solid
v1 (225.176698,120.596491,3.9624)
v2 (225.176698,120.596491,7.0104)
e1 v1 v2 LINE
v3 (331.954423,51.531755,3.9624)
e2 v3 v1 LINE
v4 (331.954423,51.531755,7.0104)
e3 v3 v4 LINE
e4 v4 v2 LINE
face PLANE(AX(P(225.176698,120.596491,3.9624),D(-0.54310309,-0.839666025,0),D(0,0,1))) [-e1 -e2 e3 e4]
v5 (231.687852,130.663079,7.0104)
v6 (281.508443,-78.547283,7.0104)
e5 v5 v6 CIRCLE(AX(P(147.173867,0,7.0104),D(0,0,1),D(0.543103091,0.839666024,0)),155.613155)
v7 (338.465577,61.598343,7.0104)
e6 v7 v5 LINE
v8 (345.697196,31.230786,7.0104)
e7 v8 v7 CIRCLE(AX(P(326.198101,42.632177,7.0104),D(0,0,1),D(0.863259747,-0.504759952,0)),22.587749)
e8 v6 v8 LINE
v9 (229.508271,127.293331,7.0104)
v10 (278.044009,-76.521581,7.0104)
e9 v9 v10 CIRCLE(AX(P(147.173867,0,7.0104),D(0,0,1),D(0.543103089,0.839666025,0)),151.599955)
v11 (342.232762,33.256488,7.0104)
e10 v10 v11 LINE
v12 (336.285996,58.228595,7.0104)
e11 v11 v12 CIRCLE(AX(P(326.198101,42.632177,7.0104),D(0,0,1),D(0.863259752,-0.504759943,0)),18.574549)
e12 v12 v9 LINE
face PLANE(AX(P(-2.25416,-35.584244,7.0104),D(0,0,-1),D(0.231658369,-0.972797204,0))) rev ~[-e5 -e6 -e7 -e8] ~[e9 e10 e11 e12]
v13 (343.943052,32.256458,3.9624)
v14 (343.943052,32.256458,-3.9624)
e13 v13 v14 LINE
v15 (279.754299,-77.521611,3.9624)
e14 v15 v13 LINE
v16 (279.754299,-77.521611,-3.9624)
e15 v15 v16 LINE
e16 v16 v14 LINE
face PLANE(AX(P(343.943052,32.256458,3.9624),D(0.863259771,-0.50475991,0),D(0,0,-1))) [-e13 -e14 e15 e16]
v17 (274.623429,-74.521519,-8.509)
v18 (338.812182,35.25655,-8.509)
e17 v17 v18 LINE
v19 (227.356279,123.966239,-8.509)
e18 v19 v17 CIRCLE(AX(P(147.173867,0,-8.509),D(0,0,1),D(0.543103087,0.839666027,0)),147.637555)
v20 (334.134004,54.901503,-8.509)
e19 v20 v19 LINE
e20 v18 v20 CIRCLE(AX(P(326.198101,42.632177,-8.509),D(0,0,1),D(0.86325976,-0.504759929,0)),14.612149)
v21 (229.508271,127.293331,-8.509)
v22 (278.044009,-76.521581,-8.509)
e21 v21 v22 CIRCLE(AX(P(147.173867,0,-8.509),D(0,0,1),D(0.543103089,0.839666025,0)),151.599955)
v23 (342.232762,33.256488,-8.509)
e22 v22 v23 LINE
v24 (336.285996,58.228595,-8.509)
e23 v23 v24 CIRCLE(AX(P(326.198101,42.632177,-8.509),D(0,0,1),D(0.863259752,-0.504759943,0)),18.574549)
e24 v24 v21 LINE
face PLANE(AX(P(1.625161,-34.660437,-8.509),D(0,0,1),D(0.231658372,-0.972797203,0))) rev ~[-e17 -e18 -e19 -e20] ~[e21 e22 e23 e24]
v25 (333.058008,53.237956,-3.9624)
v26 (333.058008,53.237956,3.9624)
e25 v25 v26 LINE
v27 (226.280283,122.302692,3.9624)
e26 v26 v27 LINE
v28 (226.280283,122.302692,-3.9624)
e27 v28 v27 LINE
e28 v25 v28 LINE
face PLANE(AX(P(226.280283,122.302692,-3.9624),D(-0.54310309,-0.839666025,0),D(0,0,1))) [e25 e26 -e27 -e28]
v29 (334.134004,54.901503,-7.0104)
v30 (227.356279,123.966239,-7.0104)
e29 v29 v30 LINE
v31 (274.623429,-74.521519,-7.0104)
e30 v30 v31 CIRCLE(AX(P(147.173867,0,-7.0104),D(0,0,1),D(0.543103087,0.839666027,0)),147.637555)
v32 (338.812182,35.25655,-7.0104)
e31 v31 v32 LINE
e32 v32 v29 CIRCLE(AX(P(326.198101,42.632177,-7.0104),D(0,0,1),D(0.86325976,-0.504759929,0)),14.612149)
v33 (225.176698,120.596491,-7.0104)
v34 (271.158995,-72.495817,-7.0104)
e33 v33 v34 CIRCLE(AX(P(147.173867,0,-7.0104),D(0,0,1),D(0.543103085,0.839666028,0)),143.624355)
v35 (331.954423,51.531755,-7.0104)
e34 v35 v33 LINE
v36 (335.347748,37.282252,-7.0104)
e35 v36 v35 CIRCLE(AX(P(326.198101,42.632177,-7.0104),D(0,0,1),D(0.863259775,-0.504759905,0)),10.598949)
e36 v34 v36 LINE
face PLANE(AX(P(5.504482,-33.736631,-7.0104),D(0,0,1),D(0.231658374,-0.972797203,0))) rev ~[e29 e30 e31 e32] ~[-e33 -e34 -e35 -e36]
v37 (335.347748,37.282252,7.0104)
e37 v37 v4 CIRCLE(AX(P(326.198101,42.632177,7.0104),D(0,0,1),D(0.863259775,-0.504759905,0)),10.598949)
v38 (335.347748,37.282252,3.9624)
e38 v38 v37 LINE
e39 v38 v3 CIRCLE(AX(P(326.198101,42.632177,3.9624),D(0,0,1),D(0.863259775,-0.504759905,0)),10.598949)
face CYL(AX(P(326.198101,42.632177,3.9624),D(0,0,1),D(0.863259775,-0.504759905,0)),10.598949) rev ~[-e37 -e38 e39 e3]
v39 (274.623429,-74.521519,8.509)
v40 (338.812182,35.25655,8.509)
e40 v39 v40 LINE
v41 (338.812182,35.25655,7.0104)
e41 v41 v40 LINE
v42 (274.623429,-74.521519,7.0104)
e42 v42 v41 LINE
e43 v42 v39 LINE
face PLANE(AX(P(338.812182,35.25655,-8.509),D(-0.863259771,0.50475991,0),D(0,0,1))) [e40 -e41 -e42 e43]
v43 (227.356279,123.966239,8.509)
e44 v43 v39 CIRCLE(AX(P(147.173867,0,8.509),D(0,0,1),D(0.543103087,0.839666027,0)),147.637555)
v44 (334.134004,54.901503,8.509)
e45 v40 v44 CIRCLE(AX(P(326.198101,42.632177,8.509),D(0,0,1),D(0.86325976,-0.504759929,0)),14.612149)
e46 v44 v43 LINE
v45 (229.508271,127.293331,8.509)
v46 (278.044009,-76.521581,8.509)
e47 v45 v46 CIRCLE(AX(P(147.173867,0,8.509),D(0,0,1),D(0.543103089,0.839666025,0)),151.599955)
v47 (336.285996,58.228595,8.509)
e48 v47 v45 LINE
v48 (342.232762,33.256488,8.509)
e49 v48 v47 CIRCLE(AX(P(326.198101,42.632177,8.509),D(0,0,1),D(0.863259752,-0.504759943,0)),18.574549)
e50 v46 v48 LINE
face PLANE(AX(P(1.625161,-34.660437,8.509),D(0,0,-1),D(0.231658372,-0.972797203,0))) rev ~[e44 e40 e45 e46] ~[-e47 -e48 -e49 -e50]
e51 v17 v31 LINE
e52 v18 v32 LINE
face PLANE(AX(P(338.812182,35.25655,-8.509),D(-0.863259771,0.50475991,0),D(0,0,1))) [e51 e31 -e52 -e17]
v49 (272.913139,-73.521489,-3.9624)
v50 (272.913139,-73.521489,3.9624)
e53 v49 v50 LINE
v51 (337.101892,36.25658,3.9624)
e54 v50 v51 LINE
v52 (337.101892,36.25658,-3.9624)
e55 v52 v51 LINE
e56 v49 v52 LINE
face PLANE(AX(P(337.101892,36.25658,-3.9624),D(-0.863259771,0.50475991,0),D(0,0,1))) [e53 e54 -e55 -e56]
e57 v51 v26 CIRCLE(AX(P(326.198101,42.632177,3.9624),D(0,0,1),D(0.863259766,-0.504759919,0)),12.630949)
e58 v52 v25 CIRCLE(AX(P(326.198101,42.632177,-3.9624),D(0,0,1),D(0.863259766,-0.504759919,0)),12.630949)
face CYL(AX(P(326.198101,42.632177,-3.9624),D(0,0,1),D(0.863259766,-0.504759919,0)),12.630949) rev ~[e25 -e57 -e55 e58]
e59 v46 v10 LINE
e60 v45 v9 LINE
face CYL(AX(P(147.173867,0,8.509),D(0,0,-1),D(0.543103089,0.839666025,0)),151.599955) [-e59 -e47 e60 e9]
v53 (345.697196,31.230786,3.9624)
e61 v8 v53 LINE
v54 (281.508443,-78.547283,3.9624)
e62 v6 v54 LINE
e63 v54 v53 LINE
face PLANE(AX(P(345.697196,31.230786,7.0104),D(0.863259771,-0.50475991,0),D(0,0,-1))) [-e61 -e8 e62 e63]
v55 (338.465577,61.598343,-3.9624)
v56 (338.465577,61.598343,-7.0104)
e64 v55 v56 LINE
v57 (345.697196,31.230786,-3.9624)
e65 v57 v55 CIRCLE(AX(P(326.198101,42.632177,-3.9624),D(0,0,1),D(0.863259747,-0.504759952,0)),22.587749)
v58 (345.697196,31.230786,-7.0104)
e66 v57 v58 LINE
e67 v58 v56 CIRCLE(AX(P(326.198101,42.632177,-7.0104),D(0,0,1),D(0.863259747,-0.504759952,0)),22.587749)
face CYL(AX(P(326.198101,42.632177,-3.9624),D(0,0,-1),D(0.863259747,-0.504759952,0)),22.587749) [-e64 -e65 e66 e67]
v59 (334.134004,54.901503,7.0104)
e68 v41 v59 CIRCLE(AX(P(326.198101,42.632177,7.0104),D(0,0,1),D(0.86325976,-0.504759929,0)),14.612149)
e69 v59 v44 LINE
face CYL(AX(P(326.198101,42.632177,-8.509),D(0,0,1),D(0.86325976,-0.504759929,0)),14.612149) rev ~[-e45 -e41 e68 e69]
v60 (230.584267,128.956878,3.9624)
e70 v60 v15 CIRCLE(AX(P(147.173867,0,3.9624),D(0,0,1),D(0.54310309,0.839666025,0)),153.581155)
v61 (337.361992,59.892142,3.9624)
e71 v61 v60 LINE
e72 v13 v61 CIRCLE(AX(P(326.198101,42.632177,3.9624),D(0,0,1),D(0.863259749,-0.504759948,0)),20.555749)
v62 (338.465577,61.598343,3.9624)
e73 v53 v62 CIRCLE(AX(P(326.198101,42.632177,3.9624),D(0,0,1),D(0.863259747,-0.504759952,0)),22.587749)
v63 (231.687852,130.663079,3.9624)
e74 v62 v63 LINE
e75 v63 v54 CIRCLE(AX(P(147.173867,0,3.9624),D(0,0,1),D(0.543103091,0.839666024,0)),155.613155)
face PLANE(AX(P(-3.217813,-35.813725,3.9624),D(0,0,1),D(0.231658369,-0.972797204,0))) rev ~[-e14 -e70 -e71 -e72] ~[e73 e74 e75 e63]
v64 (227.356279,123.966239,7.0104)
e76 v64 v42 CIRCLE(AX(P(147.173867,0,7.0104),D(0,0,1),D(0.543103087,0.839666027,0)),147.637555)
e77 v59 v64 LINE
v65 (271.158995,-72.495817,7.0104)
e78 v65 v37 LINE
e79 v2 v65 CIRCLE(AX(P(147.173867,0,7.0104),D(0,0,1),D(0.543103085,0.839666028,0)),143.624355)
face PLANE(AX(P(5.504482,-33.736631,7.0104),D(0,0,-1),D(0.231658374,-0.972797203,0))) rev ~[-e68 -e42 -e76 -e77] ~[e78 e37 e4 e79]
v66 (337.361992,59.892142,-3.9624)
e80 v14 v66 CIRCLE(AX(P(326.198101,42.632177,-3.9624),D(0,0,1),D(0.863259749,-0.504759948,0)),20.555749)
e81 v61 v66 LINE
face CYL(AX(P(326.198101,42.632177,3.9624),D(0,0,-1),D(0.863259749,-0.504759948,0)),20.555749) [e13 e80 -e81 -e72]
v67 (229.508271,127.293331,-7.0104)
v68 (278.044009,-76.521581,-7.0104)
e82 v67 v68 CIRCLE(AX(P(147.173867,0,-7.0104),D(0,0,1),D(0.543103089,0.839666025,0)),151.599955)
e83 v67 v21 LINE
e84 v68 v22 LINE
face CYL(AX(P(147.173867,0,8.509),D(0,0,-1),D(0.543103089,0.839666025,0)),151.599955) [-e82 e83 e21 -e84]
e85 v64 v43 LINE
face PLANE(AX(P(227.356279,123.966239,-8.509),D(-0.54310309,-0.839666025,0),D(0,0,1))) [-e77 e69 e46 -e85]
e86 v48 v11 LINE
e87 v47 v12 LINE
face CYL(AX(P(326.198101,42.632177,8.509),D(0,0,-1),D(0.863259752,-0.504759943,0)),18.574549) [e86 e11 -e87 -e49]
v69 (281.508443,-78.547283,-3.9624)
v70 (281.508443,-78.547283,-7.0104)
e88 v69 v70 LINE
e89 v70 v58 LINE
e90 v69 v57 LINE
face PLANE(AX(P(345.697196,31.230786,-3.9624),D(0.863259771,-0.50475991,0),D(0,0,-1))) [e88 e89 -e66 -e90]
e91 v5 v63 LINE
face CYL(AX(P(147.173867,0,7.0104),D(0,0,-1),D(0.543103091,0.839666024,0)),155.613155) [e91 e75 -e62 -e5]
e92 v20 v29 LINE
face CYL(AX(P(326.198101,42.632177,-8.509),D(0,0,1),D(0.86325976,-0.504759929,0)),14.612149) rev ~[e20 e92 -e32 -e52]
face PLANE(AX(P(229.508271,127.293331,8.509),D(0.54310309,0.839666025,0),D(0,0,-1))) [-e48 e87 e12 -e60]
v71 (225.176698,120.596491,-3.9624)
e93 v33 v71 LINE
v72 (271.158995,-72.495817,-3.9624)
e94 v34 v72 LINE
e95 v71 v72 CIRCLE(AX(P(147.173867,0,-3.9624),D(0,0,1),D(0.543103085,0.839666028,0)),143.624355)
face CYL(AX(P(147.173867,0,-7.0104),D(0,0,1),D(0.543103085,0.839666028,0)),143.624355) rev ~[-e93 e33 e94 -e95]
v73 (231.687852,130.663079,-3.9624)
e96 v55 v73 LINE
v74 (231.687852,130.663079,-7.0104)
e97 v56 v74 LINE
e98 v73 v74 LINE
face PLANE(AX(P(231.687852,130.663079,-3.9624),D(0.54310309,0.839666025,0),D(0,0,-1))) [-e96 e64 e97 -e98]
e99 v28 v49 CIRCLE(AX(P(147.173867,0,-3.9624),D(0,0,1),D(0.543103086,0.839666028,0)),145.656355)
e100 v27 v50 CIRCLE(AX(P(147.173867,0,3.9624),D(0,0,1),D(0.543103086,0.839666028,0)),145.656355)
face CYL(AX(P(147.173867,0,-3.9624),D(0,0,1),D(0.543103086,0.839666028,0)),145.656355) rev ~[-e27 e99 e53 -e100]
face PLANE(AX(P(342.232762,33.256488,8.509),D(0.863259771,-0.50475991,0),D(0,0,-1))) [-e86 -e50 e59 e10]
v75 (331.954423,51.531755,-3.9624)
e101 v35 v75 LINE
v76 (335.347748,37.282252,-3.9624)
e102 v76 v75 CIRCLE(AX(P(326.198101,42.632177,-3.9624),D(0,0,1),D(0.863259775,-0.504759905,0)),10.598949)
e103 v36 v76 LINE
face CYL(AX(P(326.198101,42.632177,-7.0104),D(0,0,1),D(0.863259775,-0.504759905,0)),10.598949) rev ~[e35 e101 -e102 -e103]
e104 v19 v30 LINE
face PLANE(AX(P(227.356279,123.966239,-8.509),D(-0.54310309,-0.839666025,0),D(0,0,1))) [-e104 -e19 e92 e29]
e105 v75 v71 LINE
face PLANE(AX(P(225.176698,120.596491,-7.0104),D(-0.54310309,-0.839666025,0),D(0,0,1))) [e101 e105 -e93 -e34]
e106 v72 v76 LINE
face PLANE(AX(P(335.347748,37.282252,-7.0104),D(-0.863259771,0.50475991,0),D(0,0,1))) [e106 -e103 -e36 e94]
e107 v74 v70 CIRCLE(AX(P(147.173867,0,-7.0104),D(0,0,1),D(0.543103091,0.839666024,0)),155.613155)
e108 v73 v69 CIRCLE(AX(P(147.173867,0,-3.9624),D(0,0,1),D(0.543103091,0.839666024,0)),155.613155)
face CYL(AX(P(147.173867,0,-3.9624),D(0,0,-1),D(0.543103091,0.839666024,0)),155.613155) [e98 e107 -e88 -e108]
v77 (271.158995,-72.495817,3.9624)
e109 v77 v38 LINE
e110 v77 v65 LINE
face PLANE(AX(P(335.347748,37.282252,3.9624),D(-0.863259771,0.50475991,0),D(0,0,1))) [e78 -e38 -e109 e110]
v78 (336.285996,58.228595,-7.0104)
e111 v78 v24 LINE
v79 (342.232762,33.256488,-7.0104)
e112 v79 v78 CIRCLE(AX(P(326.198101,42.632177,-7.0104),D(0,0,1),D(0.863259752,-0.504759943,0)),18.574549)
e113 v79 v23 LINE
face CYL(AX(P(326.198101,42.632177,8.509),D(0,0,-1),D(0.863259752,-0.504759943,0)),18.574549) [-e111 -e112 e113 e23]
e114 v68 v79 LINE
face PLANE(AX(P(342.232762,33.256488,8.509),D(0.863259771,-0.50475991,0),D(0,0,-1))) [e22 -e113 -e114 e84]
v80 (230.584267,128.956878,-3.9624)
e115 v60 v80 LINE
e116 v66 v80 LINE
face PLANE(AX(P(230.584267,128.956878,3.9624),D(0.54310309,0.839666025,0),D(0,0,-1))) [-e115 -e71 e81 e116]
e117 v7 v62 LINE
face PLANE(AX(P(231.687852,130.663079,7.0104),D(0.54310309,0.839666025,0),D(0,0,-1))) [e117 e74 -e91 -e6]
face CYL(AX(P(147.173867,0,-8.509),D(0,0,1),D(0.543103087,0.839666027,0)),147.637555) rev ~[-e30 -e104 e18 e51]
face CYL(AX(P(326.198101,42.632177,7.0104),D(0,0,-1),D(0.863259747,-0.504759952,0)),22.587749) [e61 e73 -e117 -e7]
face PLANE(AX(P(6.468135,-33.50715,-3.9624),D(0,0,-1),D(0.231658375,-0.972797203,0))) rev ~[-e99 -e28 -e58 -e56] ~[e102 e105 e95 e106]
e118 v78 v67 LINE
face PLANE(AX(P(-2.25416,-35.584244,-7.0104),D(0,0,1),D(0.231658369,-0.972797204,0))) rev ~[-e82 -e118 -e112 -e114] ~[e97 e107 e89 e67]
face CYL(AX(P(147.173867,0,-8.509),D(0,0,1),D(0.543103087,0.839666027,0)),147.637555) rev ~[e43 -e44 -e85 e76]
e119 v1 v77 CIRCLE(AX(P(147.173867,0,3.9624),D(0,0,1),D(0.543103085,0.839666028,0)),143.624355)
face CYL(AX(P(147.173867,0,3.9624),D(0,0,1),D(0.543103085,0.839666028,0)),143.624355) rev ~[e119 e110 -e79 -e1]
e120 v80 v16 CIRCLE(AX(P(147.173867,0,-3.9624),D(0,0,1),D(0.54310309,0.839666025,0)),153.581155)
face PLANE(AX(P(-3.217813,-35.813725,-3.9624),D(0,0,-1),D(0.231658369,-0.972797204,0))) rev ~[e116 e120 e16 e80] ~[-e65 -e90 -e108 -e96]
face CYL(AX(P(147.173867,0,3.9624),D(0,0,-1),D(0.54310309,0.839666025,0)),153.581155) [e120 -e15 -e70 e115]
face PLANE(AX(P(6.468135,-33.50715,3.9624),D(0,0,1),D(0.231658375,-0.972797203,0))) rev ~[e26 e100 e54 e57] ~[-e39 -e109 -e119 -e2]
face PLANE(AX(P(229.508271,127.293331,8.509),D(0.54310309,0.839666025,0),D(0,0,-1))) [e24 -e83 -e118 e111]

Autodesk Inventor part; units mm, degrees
ref_plane "Work Plane2" through (326.198101, 42.632177, 0) normal (-1, 0, 0) x (0, 0, 1)
ref_plane "Work Plane3" through (147.173867, 0, 0) normal (0.5273915, 0.8496224, 0) x (0, 0, 1)
sketch "Path" plane through (0, 0, 0) normal (0, 0, 1) x (1, 0, 0)
  arc A0 (340.522472, 34.256519) -> (335.21, 56.565049) centre (326.198101, 42.632177) ccw
  arc A1 (228.432275, 125.629785) -> (276.333719, -75.52155) centre (147.173867, 0) ccw
  line L0 (228.432275, 125.629785) -> (335.21, 56.565049)
  line L1 (340.522472, 34.256519) -> (276.333719, -75.52155)
  dimension "d31" = 11.9888
ref_plane "Section Plane" through (335.21, 56.565049, 0) normal (-0.839666, 0.5431031, 0) x (0, 0, 1)
sketch "Section Sketch" plane through (335.21, 56.565049, 0) normal (-0.839666, 0.5431031, 0) x (0, 0, 1)
  line L0 (-8.509, -1.9812) -> (8.509, -1.9812)
  line L1 (8.509, -1.9812) -> (8.509, 1.9812)
  line L2 (8.509, 1.9812) -> (-8.509, 1.9812)
  line L3 (-8.509, 1.9812) -> (-8.509, -1.9812)
  line L4 (-3.9624, -3.9624) -> (3.9624, -3.9624)
  line L5 (3.9624, -3.9624) -> (3.9624, 3.9624)
  line L6 (3.9624, 3.9624) -> (-3.9624, 3.9624)
  line L7 (-3.9624, 3.9624) -> (-3.9624, -3.9624)
  line L8 (-3.9624, 0) -> (3.9624, 0) construction
  line L9 (-7.0104, -5.9944) -> (-3.9624, -5.9944)
  line L10 (-3.9624, -5.9944) -> (-3.9624, 5.9944)
  line L11 (-3.9624, 5.9944) -> (-7.0104, 5.9944)
  line L12 (-7.0104, 5.9944) -> (-7.0104, -5.9944)
  line L13 (3.9624, -5.9944) -> (7.0104, -5.9944)
  line L14 (7.0104, -5.9944) -> (7.0104, 5.9944)
  line L15 (7.0104, 5.9944) -> (3.9624, 5.9944)
  line L16 (3.9624, 5.9944) -> (3.9624, -5.9944)
  line L17 (-8.509, 0) -> (8.509, 0) construction
  point P0 (0, 0)
  point P1 (0, 0)
  dimension "d21" = 3.9624
  dimension "d22" = 7.9248
  dimension "d23" = 7.9248
  dimension "d24" = 3.048
  dimension "d31" = 11.9888
  dimension "d32" = 17.018
sweep "Solid" add profiles "Section Sketch" path "Path"
pattern_of_one "Strand Pattern"
equation "\"d21\" = da_d2"
equation "\"d22\" = da_d1"
equation "\"d23\" = da_b1"
equation "\"d24\" = da_t1 + da_t2"
equation "\"d30\" = da_pt"
equation "\"da_p\" = 12.7"
equation "\"da_b1\" = 7.9248"
equation "\"da_h2\" = 11.9888"
equation "\"da_h3\" = 10.3886"
equation "\"da_d1\" = 7.9248"
equation "\"da_d2\" = 3.9624"
equation "\"da_pt\" = 14.3764"
equation "\"da_b\" = 17.018"
equation "\"da_t1\" = 1.524"
equation "\"da_t2\" = 1.524"
properties part number "Roller Chain"
